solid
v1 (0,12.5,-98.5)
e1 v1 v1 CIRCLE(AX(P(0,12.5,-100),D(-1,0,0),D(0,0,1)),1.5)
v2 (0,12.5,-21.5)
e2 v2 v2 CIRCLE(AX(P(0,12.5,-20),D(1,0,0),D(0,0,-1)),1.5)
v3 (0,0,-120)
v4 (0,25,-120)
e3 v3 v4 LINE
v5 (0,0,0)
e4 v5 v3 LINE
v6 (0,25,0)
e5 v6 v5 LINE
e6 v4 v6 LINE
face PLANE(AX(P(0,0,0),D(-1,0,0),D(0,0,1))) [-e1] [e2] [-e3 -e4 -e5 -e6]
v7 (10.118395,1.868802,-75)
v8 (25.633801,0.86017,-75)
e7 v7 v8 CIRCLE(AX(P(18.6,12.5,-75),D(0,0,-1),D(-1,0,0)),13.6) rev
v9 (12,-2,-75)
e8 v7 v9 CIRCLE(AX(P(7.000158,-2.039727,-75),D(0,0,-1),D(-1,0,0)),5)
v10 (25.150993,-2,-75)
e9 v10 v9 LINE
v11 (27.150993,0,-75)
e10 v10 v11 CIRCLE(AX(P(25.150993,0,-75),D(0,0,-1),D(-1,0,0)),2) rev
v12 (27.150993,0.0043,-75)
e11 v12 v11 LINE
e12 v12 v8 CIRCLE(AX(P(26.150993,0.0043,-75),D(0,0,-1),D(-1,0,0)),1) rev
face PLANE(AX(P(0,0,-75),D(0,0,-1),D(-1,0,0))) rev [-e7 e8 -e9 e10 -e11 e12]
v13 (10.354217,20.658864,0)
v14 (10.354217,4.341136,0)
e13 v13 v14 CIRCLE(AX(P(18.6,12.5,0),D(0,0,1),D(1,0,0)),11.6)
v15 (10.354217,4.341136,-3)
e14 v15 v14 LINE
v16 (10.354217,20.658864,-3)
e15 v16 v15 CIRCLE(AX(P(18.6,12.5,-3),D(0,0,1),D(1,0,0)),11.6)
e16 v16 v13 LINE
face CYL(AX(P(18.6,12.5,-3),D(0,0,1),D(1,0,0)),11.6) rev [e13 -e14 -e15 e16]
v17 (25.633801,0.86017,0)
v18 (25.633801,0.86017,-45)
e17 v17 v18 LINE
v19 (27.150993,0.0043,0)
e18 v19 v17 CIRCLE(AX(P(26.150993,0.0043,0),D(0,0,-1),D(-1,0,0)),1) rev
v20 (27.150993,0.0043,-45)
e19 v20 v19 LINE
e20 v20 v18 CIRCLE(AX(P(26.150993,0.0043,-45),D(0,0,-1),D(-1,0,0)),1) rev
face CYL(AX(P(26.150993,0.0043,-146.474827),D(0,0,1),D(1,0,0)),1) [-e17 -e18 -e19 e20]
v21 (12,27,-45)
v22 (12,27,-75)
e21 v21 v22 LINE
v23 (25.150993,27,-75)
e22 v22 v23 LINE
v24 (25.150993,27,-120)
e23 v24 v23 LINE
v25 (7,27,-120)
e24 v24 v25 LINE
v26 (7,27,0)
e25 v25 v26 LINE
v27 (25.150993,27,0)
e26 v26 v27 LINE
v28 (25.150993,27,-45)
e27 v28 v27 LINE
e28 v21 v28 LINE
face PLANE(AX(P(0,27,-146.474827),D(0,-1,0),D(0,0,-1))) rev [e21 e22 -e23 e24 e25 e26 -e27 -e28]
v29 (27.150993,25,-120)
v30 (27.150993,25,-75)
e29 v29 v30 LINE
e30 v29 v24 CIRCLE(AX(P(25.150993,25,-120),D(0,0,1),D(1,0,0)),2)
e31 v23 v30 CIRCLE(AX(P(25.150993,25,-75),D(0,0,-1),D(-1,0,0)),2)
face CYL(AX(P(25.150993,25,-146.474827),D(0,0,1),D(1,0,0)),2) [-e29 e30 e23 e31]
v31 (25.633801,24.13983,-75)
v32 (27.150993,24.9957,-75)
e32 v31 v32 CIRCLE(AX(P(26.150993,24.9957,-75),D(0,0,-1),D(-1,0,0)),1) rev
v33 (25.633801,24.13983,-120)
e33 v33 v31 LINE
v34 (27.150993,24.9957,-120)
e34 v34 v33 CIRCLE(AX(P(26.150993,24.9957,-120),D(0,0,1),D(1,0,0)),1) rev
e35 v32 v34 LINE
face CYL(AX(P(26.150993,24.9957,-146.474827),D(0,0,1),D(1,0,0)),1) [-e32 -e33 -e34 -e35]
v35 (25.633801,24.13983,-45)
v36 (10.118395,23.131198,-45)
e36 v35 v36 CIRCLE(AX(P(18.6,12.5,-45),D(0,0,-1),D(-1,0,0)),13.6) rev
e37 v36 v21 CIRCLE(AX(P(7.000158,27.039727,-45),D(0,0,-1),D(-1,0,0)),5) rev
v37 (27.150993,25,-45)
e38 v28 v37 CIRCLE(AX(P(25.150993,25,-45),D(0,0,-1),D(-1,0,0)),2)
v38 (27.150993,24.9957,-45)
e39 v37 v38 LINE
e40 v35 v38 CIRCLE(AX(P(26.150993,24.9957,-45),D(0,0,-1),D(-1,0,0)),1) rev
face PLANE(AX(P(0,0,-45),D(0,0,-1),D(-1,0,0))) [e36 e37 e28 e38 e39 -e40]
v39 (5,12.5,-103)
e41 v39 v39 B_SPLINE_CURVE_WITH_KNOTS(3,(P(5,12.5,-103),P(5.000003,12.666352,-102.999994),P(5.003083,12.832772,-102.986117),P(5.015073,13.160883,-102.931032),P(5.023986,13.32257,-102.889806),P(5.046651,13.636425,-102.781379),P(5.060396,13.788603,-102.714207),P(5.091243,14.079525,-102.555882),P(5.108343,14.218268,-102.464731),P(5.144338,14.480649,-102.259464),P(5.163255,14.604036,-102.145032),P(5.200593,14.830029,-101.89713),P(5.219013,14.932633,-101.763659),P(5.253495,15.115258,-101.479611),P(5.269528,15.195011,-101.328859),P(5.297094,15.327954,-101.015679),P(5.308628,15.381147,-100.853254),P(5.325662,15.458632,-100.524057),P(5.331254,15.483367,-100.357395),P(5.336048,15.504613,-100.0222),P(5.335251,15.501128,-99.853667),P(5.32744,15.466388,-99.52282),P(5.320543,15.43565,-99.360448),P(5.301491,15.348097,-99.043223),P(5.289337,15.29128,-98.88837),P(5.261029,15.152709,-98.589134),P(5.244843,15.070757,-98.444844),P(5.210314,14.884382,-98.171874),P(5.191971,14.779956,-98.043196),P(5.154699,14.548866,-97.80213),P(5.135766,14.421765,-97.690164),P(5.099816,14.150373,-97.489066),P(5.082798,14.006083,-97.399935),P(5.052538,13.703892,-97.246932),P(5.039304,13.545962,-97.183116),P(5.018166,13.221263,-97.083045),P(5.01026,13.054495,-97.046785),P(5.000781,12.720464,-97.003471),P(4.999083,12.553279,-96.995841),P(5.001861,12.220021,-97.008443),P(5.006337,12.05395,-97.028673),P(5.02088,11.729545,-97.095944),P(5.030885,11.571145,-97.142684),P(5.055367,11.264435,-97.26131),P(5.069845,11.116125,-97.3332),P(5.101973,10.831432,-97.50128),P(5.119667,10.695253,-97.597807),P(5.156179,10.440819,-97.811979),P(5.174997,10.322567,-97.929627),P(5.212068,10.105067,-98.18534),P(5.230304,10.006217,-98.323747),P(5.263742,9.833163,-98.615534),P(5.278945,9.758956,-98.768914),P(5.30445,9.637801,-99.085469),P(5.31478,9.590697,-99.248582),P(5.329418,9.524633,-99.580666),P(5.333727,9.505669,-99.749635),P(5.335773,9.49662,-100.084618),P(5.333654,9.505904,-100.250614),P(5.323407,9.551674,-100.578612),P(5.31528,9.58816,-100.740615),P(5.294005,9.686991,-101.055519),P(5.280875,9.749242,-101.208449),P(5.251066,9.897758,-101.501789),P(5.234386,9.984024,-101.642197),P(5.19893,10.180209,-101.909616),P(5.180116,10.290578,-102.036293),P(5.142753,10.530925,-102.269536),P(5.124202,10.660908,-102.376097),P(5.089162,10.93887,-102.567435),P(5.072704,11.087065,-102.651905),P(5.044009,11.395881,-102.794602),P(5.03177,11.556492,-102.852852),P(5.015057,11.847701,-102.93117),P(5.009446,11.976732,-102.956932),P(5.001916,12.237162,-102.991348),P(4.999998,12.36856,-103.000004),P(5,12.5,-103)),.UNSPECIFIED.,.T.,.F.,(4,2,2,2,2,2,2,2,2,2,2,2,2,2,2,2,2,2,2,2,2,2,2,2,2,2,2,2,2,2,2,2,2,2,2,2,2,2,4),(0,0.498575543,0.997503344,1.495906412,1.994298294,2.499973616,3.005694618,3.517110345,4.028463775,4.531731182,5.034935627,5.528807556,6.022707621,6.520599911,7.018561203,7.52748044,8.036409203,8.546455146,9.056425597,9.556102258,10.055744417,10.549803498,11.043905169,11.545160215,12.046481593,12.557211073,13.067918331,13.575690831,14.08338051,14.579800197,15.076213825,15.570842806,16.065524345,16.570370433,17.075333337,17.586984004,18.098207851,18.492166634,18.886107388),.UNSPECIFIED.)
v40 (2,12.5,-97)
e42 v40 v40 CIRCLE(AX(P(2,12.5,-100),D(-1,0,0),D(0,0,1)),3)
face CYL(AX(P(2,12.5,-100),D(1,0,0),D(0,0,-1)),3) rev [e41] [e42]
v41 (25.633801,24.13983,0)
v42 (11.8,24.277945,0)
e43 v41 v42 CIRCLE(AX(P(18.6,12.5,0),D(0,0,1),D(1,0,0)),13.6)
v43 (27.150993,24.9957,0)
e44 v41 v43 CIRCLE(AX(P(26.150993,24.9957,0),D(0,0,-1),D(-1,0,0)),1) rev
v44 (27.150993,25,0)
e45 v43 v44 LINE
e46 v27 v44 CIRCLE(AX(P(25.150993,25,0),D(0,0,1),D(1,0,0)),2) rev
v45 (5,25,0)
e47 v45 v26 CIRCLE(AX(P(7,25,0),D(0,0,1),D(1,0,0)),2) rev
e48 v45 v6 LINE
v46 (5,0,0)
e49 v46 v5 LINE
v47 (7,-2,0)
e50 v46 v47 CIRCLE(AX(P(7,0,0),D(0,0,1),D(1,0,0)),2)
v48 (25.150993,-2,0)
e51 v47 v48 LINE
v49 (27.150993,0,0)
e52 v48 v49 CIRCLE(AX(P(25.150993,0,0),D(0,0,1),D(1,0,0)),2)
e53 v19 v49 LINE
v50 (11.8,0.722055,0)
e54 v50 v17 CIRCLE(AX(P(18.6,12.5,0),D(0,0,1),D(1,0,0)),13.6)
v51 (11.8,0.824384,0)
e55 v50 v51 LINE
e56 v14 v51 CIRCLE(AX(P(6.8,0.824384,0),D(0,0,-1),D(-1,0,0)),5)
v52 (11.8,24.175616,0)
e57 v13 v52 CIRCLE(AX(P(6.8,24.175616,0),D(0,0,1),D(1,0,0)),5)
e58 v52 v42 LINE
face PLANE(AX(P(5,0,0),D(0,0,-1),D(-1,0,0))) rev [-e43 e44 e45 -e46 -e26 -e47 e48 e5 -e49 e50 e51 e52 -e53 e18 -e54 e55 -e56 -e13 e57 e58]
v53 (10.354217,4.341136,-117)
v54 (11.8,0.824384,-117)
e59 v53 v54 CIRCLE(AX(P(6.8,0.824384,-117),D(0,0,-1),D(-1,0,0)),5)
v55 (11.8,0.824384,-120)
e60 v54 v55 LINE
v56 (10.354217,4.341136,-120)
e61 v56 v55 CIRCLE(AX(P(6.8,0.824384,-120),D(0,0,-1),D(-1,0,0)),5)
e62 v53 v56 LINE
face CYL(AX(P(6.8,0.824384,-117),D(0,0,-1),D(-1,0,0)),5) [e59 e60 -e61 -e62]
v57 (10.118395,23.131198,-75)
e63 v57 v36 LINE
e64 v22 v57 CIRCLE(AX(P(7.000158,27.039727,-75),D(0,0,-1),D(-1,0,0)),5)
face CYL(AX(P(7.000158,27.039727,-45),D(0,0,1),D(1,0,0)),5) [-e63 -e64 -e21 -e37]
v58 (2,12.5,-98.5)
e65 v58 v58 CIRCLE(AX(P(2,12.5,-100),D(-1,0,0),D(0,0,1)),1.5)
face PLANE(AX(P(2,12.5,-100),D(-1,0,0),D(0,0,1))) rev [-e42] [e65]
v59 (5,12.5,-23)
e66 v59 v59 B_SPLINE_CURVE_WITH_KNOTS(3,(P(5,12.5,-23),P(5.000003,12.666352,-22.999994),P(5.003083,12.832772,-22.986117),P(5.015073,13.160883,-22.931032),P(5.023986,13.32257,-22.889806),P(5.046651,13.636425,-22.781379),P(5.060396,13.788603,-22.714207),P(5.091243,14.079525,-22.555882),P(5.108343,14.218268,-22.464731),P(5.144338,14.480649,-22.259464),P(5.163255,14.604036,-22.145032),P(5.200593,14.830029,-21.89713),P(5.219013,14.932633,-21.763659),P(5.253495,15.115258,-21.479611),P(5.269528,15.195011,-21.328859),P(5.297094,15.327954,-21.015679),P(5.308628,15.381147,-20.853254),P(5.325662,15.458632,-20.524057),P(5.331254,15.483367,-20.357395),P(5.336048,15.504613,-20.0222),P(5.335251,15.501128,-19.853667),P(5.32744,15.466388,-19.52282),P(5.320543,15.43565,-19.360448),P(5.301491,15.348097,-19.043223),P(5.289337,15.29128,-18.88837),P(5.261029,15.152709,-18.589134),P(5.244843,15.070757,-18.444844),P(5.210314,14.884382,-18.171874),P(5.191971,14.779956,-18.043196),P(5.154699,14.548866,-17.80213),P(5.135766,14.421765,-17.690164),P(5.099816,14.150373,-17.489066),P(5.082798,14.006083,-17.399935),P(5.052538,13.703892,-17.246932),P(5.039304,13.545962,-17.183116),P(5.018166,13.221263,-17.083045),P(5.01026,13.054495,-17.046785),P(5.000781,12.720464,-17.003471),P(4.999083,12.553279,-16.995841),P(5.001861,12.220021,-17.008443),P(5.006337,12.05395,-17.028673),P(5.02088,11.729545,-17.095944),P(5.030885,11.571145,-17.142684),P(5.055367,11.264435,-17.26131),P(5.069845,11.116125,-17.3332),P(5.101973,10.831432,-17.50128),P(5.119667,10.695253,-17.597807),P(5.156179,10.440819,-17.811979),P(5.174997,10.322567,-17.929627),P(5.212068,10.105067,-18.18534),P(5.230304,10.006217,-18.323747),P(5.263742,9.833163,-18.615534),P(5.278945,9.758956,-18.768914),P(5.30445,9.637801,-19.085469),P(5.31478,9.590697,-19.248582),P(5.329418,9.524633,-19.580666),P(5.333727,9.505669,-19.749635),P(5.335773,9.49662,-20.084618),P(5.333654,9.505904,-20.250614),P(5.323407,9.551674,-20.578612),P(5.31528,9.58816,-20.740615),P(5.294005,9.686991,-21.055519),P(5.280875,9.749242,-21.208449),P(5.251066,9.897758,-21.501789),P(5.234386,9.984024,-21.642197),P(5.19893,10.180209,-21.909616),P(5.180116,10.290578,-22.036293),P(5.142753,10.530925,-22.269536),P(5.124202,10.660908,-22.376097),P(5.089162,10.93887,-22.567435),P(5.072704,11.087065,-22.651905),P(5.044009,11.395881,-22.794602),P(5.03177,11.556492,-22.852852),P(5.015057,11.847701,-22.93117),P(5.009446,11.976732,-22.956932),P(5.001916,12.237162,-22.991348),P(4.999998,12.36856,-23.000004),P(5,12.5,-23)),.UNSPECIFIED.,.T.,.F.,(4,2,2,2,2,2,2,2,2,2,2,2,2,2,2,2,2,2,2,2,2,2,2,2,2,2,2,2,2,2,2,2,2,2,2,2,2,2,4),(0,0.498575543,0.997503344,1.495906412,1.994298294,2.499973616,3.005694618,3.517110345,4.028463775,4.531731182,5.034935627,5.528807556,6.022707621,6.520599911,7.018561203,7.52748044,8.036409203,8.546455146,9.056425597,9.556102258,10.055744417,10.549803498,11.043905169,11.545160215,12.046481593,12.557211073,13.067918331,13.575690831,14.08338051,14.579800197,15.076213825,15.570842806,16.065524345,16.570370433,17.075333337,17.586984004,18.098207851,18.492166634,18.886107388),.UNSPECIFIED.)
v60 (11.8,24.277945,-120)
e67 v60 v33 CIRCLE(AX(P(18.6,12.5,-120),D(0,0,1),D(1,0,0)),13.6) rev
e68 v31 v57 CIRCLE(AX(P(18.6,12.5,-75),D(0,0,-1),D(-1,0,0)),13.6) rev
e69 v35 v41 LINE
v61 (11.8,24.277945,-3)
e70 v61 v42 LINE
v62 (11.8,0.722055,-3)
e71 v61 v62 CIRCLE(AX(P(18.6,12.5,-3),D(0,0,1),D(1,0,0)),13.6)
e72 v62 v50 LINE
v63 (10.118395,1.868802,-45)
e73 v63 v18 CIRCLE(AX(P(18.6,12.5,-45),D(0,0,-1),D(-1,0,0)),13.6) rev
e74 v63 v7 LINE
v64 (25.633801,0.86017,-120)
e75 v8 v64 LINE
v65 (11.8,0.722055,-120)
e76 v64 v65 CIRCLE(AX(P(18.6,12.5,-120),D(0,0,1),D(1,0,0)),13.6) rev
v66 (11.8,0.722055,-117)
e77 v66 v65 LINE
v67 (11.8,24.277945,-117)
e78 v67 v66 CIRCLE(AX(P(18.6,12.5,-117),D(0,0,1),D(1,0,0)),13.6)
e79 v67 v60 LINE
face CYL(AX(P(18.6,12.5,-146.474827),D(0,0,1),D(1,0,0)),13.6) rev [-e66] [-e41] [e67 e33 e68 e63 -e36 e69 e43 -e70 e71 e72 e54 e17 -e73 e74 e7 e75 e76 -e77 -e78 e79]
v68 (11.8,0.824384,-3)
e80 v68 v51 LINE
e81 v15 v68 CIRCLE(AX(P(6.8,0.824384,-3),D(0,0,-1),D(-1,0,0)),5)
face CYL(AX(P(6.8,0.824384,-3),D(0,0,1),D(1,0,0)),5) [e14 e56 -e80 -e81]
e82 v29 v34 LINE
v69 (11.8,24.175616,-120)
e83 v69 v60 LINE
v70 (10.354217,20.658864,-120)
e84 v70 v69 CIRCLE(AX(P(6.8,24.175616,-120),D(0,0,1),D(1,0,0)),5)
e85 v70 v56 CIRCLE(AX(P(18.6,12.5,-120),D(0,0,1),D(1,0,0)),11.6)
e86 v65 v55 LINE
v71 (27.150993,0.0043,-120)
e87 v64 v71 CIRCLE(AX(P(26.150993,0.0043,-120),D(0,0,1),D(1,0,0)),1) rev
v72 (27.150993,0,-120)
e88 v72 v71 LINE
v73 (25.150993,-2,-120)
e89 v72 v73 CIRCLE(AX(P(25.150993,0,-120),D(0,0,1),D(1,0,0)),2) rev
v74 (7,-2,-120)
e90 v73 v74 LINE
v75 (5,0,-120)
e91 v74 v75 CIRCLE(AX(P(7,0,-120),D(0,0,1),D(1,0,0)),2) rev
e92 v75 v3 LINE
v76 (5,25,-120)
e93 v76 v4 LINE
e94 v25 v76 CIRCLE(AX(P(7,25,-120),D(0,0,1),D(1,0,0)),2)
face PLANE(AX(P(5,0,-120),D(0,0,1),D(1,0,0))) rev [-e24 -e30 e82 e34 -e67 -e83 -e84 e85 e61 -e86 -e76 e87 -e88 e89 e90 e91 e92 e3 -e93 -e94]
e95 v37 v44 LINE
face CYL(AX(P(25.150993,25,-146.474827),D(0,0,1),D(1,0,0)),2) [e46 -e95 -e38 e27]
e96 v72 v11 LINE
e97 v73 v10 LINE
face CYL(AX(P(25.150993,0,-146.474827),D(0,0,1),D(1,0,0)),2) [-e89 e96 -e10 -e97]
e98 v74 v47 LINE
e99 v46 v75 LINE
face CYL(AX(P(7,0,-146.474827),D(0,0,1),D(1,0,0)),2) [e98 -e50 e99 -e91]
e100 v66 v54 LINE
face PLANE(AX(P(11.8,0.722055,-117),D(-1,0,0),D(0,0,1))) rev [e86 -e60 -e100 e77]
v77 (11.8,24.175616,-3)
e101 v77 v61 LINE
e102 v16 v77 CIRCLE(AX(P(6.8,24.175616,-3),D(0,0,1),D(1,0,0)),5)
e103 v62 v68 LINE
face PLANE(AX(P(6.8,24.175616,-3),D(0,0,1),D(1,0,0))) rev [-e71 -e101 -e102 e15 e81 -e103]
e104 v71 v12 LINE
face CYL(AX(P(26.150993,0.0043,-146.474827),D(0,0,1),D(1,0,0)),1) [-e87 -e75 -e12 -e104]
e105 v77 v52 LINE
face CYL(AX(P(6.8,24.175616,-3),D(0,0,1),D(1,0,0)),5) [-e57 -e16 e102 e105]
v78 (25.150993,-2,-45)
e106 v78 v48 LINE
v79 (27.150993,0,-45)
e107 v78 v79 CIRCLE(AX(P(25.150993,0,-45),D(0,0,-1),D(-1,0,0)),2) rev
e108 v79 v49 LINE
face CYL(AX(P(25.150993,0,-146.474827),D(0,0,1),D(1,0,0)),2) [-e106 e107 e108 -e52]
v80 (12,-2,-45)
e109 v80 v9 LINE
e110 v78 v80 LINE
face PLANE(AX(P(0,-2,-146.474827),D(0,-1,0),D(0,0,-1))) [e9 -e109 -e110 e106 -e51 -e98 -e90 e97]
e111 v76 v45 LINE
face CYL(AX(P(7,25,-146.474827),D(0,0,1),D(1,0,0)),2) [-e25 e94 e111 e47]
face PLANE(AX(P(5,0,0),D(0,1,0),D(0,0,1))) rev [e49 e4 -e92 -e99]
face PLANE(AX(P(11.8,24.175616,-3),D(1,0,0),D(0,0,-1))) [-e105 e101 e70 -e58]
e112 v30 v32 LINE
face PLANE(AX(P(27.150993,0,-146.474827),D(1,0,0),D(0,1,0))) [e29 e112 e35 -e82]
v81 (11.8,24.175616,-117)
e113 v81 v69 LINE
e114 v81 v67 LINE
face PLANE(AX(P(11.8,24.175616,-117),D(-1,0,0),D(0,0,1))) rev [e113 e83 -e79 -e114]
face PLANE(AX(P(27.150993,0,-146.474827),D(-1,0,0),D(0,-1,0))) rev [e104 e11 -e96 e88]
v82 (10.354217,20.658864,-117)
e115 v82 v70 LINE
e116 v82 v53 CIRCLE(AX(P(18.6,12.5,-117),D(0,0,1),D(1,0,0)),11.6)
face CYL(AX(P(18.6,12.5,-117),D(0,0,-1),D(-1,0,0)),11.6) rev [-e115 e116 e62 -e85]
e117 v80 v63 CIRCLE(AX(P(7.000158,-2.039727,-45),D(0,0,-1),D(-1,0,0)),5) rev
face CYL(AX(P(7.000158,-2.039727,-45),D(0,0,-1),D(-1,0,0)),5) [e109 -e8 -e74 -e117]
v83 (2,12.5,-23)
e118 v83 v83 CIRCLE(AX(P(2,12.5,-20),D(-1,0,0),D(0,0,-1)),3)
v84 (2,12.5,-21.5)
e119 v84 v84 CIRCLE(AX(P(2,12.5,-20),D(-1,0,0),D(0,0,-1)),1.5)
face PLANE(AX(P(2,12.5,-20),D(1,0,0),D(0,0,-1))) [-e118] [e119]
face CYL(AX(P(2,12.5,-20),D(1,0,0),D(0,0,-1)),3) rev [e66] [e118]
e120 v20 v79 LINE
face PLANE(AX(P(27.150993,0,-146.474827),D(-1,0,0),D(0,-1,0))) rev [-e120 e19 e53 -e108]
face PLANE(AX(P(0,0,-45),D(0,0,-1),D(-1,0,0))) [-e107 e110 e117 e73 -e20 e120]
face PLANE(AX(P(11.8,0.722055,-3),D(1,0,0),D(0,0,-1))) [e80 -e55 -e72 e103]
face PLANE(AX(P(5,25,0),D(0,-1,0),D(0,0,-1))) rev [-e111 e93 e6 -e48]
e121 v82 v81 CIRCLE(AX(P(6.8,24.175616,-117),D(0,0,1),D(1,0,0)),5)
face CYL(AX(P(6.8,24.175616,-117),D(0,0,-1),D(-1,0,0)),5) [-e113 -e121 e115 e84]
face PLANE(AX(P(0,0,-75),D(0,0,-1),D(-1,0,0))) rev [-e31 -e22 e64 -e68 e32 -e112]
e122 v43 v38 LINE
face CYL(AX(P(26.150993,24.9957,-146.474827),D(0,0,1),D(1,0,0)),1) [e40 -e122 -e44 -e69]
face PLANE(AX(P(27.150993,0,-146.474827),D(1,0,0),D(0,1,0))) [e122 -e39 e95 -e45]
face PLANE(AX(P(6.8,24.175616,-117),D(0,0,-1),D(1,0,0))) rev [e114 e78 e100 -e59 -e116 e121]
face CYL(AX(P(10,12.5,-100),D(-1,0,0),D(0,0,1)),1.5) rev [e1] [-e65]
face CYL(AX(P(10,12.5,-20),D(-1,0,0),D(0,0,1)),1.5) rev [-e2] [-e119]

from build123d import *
from build123d.topology import SkipClean

# Parameters (mm, degrees)
SKETCH1_W          = 120
SKETCH1_H          = 25
BASE_DEPTH         = 5
CLIP_DEPTH         = 120
SKETCH3_R          = 1.5
SCREWHOLES_DEPTH   = 10
CLIPWALL_DEPTH     = 3
ROUNDEDCORNERS_R   = 1
SKETCH5_W          = 15.150992531
SKETCH5_H          = 29
FINGERGAP_DEPTH    = 15
FINGERGROOVE_R     = 5
CUT_EXTRUDE1_START = -2
SKETCH3_3_R        = 3
SKETCH3_3_R_2      = 1.5
CUT_EXTRUDE1_DEPTH = 5


with BuildPart() as part:
    # Sketch1 → Base (new body)
    with BuildSketch(Plane(origin=(0, 0, 0), x_dir=(0, 0, -1), z_dir=(1, 0, 0))):
        with Locations((60, 12.5)):
            Rectangle(SKETCH1_W, SKETCH1_H)
    extrude(amount=BASE_DEPTH)

    # Sketch2 → Clip (add)
    with BuildSketch(Plane.XY):
        with BuildLine():
            Line((25.150992531, 27), (7, 27))
            ThreePointArc((7, 27), (5.585786438, 26.414213562), (5, 25))
            Line((5, 25), (5, 12.5))
            ThreePointArc((5, 12.5), (12.740541767, 24.773008971), (27.150992531, 23.075468156))
            Line((27.150992531, 23.075468156), (27.150992531, 25))
            ThreePointArc((27.150992531, 25), (26.565206094, 26.414213562), (25.150992531, 27))
        make_face()
        with BuildLine():
            ThreePointArc((27.150992531, 1.924531844), (12.740541767, 0.226991029), (5, 12.5))
            Line((5, 12.5), (5, 0))
            ThreePointArc((5, 0), (5.585786438, -1.414213562), (7, -2))
            Line((7, -2), (25.150992531, -2))
            ThreePointArc((25.150992531, -2), (26.565206094, -1.414213562), (27.150992531, 0))
            Line((27.150992531, 0), (27.150992531, 1.924531844))
        make_face()
    extrude(amount=-CLIP_DEPTH)

    # Sketch3 → ScrewHoles (cut)
    with SkipClean():  # the faces are left unmerged after this step: merging them gives an invalid solid
        with BuildSketch(Plane.ZY):
            with Locations((-100, 12.5)):
                Circle(SKETCH3_R)
            with Locations((-20, 12.5)):
                Circle(SKETCH3_R)
        extrude(amount=-SCREWHOLES_DEPTH, mode=Mode.SUBTRACT)

    # Sketch4 → ClipWall (add)
    with SkipClean():  # the faces are left unmerged after this step: merging them gives an invalid solid
        with BuildSketch(Plane.XY):
            with BuildLine():
                ThreePointArc((10.354216867, 4.341136076), (7, 12.5), (10.354216867, 20.658863924))
                ThreePointArc((10.354216867, 20.658863924), (11.424450472, 22.274442864), (11.8, 24.175615615))
                Line((11.8, 24.175615615), (11.8, 24.277945491))
                ThreePointArc((11.8, 24.277945491), (5, 12.5), (11.8, 0.722054509))
                Line((11.8, 0.722054509), (11.8, 0.824384385))
                ThreePointArc((11.8, 0.824384385), (11.424450472, 2.725557136), (10.354216867, 4.341136076))
            make_face()
        clipwall = extrude(amount=-CLIPWALL_DEPTH)

    # Mirror1: ClipWall across plane
    with SkipClean():  # the faces are left unmerged after this step: merging them gives an invalid solid
        add(clipwall.mirror(Plane(origin=(0, 0, -60), x_dir=(1, 0, 0), z_dir=(0, 0, -1))))

    # RoundedCorners
    roundedcorners_edges = [part.edges().sort_by_distance(p)[0] for p in [
        (27.150992531, 23.075468156, -60),
        (27.150992531, 1.924531844, -60),
    ]]
    fillet(roundedcorners_edges, radius=ROUNDEDCORNERS_R)

    # Sketch5 → FingerGap (cut, symmetric)
    with BuildSketch(Plane(origin=(0, 0, -60), x_dir=(-1, 0, 0), z_dir=(0, 0, -1))):
        with Locations((-19.575496265, 12.5)):
            Rectangle(SKETCH5_W, SKETCH5_H)
    extrude(amount=FINGERGAP_DEPTH, both=True, mode=Mode.SUBTRACT)

    # FingerGroove
    # the kernel refuses this fillet: 5 mm, written as the material it takes off along each edge
    with BuildSketch(Plane(origin=(12, 0.608826803, -75), x_dir=(0, -1, 0), z_dir=(0, 0, 1))) as fingergroove_piece_1:
        with BuildLine():
            CenterArc((2.648427898, -5), FINGERGROOVE_R, 90, 51.416397028)
            ThreePointArc((-1.26006702, -1.88172043), (-0.590797761, -0.96713387), (0, 0))
            Line((0, 0), (2.648427898, 0))
        make_face()
    extrude(amount=30, mode=Mode.SUBTRACT)
    with BuildSketch(Plane(origin=(12, 24.391173197, -75), x_dir=(0, 1, 0), z_dir=(0, 0, 1))) as fingergroove_piece_2:
        with BuildLine():
            CenterArc((2.648427898, 5), FINGERGROOVE_R, 218.583602972, 51.416397028)
            ThreePointArc((-1.26006702, 1.88172043), (-0.590797761, 0.96713387), (0, 0))
            Line((0, 0), (2.648427898, 0))
        make_face()
    extrude(amount=30, mode=Mode.SUBTRACT)

    # Sketch3<3> → Cut-Extrude1 (cut)
    # profile 1 of 2: a face of its own
    with BuildSketch(Plane.ZY.offset(CUT_EXTRUDE1_START)):
        with Locations(Location((-100, 12.5, 0), (0, 0, 180))):
            Circle(SKETCH3_3_R)
        with Locations((-100, 12.5)):
            Circle(SKETCH3_3_R_2, mode=Mode.SUBTRACT)
    # profile 2 of 2: a face of its own
    with BuildSketch(Plane.ZY.offset(CUT_EXTRUDE1_START)):
        with Locations(Location((-20, 12.5, 0), (0, 0, 180))):
            Circle(SKETCH3_3_R)
        with Locations(Location((-20, 12.5, 0), (0, 0, 180))):
            Circle(SKETCH3_3_R_2, mode=Mode.SUBTRACT)
    extrude(amount=-CUT_EXTRUDE1_DEPTH, mode=Mode.SUBTRACT)


solid = part.part
